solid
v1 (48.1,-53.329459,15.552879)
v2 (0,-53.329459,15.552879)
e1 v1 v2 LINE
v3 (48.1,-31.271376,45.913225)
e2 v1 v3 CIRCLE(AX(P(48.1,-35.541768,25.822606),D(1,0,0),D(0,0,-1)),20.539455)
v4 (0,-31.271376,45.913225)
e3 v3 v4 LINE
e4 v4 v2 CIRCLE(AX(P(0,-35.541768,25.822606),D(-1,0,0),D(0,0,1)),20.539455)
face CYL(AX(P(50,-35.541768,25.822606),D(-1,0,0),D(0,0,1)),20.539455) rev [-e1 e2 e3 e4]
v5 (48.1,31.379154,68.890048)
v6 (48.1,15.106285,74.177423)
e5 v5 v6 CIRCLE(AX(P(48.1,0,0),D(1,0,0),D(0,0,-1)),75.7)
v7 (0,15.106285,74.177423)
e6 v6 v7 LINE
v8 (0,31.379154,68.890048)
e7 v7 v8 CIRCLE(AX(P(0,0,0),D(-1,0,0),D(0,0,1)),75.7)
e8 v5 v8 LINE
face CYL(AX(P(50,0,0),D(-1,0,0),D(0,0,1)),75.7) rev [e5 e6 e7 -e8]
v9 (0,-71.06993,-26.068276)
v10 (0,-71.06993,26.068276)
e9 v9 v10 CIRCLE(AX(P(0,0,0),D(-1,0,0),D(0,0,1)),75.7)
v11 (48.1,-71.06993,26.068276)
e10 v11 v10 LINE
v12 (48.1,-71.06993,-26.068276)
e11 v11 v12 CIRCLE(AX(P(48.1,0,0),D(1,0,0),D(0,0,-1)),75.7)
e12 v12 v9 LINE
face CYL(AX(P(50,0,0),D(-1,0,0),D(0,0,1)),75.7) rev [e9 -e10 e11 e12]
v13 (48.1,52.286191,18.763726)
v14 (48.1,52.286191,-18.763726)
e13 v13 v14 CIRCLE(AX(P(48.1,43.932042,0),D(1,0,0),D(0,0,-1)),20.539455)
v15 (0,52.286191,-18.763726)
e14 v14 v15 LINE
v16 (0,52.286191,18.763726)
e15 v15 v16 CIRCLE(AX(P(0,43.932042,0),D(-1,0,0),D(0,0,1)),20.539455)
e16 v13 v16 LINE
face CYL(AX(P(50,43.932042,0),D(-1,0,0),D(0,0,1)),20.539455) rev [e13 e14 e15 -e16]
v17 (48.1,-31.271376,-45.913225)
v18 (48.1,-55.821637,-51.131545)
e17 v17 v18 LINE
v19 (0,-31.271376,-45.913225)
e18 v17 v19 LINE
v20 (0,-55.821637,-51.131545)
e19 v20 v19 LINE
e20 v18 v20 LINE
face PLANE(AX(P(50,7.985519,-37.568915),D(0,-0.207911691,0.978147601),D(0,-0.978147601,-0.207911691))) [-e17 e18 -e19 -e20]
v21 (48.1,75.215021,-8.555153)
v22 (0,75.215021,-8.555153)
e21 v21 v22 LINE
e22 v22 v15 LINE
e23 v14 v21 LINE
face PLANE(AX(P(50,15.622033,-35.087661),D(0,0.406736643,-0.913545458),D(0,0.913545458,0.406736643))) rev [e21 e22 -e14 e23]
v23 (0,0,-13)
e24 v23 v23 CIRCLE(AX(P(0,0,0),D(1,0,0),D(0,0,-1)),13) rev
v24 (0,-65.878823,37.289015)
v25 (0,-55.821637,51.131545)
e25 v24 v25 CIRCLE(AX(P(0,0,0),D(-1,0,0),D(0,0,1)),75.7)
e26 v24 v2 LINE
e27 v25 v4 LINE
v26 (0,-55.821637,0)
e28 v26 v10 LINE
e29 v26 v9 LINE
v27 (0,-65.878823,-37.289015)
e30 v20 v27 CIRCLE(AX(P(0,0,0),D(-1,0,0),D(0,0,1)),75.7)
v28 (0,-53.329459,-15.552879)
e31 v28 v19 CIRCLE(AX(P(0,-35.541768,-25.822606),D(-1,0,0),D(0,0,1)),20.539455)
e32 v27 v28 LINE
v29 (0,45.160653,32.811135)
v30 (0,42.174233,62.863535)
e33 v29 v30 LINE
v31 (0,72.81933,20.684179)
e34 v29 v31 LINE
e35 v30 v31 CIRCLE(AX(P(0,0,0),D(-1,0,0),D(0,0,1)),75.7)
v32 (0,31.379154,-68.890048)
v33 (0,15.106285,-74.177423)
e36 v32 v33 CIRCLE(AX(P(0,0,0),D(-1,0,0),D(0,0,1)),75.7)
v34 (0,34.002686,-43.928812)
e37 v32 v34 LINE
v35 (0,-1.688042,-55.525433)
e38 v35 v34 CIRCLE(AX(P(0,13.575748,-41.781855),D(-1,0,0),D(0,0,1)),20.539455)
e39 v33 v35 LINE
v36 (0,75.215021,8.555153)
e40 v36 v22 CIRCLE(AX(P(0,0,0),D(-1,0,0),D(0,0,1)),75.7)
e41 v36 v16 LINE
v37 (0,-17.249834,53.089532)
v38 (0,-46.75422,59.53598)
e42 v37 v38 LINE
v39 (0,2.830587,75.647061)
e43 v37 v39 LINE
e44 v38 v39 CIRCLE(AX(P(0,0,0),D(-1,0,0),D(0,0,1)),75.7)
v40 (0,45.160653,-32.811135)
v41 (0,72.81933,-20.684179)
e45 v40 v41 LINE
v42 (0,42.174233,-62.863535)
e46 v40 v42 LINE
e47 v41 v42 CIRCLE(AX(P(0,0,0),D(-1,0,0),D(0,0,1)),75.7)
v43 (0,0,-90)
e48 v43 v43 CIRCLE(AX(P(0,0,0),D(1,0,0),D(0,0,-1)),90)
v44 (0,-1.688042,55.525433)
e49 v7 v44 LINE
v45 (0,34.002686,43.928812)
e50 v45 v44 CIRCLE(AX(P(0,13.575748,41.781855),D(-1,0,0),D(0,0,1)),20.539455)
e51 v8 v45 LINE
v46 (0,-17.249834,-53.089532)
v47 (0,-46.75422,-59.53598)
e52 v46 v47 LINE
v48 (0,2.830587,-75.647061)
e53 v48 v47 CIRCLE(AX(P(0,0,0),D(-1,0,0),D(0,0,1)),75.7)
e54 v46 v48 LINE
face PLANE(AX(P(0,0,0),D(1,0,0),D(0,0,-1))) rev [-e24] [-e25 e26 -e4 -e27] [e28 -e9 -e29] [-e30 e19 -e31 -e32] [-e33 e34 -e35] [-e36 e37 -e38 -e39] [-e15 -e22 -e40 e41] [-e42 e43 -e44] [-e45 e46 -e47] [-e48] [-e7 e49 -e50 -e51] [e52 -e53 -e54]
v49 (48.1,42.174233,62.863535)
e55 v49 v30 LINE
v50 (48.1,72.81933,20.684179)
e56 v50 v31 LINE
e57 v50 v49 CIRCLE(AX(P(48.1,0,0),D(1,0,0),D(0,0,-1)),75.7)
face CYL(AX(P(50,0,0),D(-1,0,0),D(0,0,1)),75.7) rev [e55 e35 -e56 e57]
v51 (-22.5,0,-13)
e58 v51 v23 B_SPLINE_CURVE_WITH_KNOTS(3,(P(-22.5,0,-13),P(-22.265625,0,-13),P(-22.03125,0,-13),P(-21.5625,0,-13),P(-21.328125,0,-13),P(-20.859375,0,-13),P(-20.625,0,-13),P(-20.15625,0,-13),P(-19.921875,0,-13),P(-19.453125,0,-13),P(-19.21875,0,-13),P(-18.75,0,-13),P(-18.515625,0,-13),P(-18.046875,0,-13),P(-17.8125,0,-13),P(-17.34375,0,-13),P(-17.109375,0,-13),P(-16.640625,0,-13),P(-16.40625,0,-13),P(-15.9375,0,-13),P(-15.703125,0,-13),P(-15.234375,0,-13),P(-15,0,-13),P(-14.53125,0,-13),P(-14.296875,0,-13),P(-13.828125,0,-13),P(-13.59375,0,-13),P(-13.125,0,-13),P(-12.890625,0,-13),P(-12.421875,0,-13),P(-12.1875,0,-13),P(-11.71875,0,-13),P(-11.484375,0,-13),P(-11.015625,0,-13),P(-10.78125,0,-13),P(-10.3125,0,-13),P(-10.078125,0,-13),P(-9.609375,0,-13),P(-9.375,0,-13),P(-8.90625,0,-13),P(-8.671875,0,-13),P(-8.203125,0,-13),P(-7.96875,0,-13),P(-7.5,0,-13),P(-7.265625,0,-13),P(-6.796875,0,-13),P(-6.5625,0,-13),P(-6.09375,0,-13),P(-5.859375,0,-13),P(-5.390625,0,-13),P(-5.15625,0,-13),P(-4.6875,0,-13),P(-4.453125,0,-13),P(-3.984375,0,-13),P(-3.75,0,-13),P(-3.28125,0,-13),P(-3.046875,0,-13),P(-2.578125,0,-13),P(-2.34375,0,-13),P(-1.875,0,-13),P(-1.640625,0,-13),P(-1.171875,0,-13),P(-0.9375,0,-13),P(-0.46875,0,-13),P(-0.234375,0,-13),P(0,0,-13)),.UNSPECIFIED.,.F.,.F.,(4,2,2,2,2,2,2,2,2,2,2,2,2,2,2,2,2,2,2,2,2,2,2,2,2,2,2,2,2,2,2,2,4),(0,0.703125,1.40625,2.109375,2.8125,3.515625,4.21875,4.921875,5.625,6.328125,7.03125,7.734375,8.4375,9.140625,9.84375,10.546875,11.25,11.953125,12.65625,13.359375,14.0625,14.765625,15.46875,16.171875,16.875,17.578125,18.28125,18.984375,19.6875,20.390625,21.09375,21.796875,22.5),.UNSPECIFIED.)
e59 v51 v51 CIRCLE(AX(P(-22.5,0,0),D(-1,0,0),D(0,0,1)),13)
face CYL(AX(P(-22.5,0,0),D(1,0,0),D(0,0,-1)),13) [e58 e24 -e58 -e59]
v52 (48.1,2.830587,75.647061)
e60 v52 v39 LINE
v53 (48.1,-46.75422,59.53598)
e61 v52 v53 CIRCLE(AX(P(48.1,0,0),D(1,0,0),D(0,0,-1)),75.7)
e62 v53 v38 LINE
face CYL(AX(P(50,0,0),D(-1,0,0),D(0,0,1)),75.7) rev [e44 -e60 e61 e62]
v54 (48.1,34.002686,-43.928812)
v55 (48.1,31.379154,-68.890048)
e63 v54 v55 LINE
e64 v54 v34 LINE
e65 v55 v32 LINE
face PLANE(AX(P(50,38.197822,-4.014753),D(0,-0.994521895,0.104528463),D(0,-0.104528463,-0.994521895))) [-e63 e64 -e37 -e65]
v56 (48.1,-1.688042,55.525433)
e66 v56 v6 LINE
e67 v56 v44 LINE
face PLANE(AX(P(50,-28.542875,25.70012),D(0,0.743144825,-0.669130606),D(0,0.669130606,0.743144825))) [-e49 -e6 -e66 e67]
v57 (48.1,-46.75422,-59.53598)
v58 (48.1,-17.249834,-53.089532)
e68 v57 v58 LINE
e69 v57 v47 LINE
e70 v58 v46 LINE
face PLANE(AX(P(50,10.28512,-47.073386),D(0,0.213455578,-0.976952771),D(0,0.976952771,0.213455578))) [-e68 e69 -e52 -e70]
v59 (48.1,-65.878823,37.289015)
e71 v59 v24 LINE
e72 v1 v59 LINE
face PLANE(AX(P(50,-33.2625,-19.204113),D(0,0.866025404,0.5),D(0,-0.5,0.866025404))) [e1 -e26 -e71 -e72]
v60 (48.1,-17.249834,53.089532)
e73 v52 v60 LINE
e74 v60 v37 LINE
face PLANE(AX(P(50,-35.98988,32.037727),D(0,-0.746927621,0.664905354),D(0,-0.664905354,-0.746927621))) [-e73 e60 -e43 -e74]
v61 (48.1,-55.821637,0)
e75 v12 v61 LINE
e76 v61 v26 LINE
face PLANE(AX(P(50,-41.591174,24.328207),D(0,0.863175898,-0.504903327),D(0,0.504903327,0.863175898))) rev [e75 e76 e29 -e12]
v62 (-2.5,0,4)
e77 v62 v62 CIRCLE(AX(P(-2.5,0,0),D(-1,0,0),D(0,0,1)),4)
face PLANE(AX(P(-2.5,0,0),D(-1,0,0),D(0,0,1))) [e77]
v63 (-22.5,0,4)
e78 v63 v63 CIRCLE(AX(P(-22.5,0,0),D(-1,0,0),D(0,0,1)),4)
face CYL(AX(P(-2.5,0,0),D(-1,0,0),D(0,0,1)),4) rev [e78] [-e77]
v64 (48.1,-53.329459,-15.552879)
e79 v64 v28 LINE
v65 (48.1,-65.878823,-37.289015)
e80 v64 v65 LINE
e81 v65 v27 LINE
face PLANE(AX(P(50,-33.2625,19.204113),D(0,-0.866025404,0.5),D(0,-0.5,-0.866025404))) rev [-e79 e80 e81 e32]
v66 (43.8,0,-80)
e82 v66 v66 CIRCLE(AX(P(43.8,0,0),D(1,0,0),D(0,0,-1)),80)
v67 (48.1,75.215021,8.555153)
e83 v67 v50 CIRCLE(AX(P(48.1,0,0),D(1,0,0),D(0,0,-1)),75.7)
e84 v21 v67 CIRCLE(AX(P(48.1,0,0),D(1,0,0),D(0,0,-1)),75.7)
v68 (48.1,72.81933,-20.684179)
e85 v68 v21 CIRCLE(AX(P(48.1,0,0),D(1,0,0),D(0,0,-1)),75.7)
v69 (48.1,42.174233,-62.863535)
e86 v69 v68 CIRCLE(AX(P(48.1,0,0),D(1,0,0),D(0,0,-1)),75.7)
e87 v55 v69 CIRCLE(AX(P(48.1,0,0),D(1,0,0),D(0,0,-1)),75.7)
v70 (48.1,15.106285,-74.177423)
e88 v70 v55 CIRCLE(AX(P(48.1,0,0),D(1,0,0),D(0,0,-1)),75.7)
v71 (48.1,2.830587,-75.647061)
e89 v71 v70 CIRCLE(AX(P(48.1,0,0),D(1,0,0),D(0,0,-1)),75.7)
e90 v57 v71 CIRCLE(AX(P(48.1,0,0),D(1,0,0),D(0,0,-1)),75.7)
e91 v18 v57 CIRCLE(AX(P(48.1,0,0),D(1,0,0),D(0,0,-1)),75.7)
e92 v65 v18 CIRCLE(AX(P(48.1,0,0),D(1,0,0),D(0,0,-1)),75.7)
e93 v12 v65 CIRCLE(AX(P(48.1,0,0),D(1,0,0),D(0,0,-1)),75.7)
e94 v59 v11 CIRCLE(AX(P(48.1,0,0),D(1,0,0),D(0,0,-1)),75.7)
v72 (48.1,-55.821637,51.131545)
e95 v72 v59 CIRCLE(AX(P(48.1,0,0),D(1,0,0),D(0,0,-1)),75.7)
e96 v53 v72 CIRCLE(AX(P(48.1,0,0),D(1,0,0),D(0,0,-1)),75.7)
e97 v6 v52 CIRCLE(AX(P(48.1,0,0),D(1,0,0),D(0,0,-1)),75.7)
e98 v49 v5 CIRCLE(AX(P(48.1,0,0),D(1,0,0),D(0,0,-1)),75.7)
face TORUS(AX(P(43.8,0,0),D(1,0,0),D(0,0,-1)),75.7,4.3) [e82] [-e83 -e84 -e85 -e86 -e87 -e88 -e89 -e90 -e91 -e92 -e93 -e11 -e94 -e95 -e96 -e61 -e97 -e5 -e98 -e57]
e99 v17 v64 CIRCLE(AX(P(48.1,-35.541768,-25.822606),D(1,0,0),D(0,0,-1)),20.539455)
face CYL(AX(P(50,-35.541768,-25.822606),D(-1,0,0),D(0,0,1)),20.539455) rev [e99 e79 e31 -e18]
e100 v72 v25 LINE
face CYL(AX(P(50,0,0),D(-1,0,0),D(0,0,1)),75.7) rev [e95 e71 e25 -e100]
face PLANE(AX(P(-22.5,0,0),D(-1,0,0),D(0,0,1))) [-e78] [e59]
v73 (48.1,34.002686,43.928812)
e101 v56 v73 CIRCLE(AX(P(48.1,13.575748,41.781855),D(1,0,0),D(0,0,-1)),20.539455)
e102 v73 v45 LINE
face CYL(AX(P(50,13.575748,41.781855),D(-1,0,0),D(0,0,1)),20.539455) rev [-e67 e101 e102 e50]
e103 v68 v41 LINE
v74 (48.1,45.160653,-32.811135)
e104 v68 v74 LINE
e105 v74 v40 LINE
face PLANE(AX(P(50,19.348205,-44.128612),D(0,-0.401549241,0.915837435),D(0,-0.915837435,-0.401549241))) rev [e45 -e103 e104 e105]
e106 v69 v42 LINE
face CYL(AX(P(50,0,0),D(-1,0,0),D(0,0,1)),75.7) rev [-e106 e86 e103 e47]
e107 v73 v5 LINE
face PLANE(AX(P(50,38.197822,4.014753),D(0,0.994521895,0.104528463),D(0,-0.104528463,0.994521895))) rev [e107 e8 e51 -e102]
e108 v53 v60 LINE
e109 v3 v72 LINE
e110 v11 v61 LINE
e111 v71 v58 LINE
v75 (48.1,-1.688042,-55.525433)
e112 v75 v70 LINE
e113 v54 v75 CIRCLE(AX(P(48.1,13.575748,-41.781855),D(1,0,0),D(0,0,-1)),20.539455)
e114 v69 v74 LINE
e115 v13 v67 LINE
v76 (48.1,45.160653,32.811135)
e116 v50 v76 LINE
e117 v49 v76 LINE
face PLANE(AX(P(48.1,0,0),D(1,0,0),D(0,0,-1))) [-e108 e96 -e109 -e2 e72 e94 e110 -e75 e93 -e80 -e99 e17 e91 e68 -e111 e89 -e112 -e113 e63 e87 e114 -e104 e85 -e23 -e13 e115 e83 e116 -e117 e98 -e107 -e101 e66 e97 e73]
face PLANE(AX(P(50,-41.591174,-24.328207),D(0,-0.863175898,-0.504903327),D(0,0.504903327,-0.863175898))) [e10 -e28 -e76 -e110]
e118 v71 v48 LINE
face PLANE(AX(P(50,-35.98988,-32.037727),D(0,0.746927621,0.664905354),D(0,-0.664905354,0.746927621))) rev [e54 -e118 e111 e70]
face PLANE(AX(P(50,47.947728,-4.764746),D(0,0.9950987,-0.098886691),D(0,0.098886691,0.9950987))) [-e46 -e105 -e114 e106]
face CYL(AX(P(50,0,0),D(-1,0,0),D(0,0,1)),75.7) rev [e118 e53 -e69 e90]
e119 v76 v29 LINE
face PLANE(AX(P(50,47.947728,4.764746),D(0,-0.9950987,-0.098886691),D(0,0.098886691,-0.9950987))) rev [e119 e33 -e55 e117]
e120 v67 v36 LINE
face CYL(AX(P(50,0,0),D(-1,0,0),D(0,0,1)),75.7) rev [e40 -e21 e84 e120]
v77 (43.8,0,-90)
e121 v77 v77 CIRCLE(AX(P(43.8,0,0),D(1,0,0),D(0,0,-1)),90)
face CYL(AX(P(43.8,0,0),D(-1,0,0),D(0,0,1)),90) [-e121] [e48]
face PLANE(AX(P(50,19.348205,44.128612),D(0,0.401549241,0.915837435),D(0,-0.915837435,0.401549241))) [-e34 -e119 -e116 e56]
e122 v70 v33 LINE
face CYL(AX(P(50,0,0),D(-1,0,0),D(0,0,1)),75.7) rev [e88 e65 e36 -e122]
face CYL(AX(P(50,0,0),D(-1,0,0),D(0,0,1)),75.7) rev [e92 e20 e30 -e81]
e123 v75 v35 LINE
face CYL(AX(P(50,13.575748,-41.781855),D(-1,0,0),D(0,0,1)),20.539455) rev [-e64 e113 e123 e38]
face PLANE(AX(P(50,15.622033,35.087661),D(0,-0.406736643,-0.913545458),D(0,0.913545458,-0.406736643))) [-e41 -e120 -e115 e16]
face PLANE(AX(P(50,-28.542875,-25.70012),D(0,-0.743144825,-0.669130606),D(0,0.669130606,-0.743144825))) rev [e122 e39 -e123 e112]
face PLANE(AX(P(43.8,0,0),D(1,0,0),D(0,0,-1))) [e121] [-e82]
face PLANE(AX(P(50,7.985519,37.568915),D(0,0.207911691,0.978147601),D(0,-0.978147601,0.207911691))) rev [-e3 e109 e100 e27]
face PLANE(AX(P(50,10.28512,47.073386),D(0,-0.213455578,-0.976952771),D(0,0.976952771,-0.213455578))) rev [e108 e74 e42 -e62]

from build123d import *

# Parameters (mm, degrees)
SKETCH1_R           = 90
BOSS_EXTRUDE1_DEPTH = 43.8
SKETCH3_R           = 13
BOSS_EXTRUDE2_DEPTH = 22.5
SKETCH4_R           = 4
CUT_EXTRUDE1_DEPTH  = 20
SKETCH9_R           = 80
BOSS_EXTRUDE3_DEPTH = 4.3
FILLET1_R           = 4.3
CUT_EXTRUDE4_DEPTH  = 50


with BuildPart() as part:
    # Sketch1 → Boss-Extrude1 (new body)
    with BuildSketch(Plane(origin=(0, 0, 0), x_dir=(0, 0, -1), z_dir=(1, 0, 0))):
        Circle(SKETCH1_R)
    extrude(amount=BOSS_EXTRUDE1_DEPTH)

    # Sketch3 → Boss-Extrude2 (add)
    with BuildSketch(Plane.ZY):
        with Locations(Location((0, 0, 0), (0, 0, 180))):
            Circle(SKETCH3_R)
    extrude(amount=BOSS_EXTRUDE2_DEPTH)

    # Sketch4 → Cut-Extrude1 (cut)
    with BuildSketch(Plane.ZY.offset(22.5)):
        Circle(SKETCH4_R)
    extrude(amount=-CUT_EXTRUDE1_DEPTH, mode=Mode.SUBTRACT)

    # Sketch9 → Boss-Extrude3 (add)
    with BuildSketch(Plane(origin=(43.8, 0, 0), x_dir=(0, 0, -1), z_dir=(1, 0, 0))):
        Circle(SKETCH9_R)
    extrude(amount=BOSS_EXTRUDE3_DEPTH)

    # Fillet1
    fillet1_edges = [part.edges().sort_by_distance(p)[0] for p in [
        (48.1, 0, 80),
    ]]
    fillet(fillet1_edges, radius=FILLET1_R - 0.0001)  # a hair under: the kernel refuses the full size

    # Sketch13 → Cut-Extrude4 (cut)
    with BuildSketch(Plane.ZY):
        with BuildLine():
            Line((-74.177423439, 15.106285183), (-55.525432971, -1.688042469))
            ThreePointArc((-55.525432971, -1.688042469), (-22.247671799, 7.228706763), (-43.928812425, 34.002685672))
            Line((-43.928812425, 34.002685672), (-68.890047808, 31.379154116))
            ThreePointArc((-68.890047808, 31.379154116), (-71.994978284, 23.392586474), (-74.177423439, 15.106285183))
        make_face()
        with BuildLine():
            Line((-32.811134979, 45.160652975), (-20.684178649, 72.819329533))
            ThreePointArc((-20.684178649, 72.819329533), (-44.495343599, 61.242586474), (-62.863535147, 42.174233233))
            Line((-62.863535147, 42.174233233), (-32.811134979, 45.160652975))
        make_face()
        with BuildLine():
            Line((-8.555153481, 75.215020767), (-18.763726198, 52.286191037))
            ThreePointArc((-18.763726198, 52.286191037), (0, 23.392586474), (18.763726198, 52.286191037))
            Line((18.763726198, 52.286191037), (8.555153481, 75.215020767))
            ThreePointArc((8.555153481, 75.215020767), (0, 75.7), (-8.555153481, 75.215020767))
        make_face()
        with BuildLine():
            Line((32.811134979, 45.160652975), (62.863535147, 42.174233233))
            ThreePointArc((62.863535147, 42.174233233), (44.495343599, 61.242586474), (20.684178649, 72.819329533))
            Line((20.684178649, 72.819329533), (32.811134979, 45.160652975))
        make_face()
        with BuildLine():
            Line((74.177423439, 15.106285183), (55.525432971, -1.688042469))
            ThreePointArc((55.525432971, -1.688042469), (22.247671799, 7.228706763), (43.928812425, 34.002685672))
            Line((43.928812425, 34.002685672), (68.890047808, 31.379154116))
            ThreePointArc((68.890047808, 31.379154116), (71.994978284, 23.392586474), (74.177423439, 15.106285183))
        make_face()
        with BuildLine():
            Line((53.089531605, -17.249834482), (59.535980023, -46.754219945))
            ThreePointArc((59.535980023, -46.754219945), (71.994978284, -23.392586474), (75.647060582, 2.830587456))
            Line((75.647060582, 2.830587456), (53.089531605, -17.249834482))
        make_face()
        with BuildLine():
            Line((51.131544513, -55.821636985), (45.913225362, -31.271375583))
            ThreePointArc((45.913225362, -31.271375583), (13.749817343, -18.925), (15.552878618, -53.329458657))
            Line((15.552878618, -53.329458657), (37.289015401, -65.87882308))
            ThreePointArc((37.289015401, -65.87882308), (44.495343599, -61.242586474), (51.131544513, -55.821636985))
        make_face()
        with BuildLine():
            Line((0, -55.821636985), (-26.068275939, -71.069930277))
            ThreePointArc((-26.068275939, -71.069930277), (0, -75.7), (26.068275939, -71.069930277))
            Line((26.068275939, -71.069930277), (0, -55.821636985))
        make_face()
        with BuildLine():
            Line((-37.289015401, -65.87882308), (-15.552878618, -53.329458657))
            ThreePointArc((-15.552878618, -53.329458657), (-13.749817343, -18.925), (-45.913225362, -31.271375583))
            Line((-45.913225362, -31.271375583), (-51.131544513, -55.821636985))
            ThreePointArc((-51.131544513, -55.821636985), (-44.495343599, -61.242586474), (-37.289015401, -65.87882308))
        make_face()
        with BuildLine():
            Line((-53.089531605, -17.249834482), (-75.647060582, 2.830587456))
            ThreePointArc((-75.647060582, 2.830587456), (-71.994978284, -23.392586474), (-59.535980023, -46.754219945))
            Line((-59.535980023, -46.754219945), (-53.089531605, -17.249834482))
        make_face()
    extrude(amount=-CUT_EXTRUDE4_DEPTH, mode=Mode.SUBTRACT)


solid = part.part
